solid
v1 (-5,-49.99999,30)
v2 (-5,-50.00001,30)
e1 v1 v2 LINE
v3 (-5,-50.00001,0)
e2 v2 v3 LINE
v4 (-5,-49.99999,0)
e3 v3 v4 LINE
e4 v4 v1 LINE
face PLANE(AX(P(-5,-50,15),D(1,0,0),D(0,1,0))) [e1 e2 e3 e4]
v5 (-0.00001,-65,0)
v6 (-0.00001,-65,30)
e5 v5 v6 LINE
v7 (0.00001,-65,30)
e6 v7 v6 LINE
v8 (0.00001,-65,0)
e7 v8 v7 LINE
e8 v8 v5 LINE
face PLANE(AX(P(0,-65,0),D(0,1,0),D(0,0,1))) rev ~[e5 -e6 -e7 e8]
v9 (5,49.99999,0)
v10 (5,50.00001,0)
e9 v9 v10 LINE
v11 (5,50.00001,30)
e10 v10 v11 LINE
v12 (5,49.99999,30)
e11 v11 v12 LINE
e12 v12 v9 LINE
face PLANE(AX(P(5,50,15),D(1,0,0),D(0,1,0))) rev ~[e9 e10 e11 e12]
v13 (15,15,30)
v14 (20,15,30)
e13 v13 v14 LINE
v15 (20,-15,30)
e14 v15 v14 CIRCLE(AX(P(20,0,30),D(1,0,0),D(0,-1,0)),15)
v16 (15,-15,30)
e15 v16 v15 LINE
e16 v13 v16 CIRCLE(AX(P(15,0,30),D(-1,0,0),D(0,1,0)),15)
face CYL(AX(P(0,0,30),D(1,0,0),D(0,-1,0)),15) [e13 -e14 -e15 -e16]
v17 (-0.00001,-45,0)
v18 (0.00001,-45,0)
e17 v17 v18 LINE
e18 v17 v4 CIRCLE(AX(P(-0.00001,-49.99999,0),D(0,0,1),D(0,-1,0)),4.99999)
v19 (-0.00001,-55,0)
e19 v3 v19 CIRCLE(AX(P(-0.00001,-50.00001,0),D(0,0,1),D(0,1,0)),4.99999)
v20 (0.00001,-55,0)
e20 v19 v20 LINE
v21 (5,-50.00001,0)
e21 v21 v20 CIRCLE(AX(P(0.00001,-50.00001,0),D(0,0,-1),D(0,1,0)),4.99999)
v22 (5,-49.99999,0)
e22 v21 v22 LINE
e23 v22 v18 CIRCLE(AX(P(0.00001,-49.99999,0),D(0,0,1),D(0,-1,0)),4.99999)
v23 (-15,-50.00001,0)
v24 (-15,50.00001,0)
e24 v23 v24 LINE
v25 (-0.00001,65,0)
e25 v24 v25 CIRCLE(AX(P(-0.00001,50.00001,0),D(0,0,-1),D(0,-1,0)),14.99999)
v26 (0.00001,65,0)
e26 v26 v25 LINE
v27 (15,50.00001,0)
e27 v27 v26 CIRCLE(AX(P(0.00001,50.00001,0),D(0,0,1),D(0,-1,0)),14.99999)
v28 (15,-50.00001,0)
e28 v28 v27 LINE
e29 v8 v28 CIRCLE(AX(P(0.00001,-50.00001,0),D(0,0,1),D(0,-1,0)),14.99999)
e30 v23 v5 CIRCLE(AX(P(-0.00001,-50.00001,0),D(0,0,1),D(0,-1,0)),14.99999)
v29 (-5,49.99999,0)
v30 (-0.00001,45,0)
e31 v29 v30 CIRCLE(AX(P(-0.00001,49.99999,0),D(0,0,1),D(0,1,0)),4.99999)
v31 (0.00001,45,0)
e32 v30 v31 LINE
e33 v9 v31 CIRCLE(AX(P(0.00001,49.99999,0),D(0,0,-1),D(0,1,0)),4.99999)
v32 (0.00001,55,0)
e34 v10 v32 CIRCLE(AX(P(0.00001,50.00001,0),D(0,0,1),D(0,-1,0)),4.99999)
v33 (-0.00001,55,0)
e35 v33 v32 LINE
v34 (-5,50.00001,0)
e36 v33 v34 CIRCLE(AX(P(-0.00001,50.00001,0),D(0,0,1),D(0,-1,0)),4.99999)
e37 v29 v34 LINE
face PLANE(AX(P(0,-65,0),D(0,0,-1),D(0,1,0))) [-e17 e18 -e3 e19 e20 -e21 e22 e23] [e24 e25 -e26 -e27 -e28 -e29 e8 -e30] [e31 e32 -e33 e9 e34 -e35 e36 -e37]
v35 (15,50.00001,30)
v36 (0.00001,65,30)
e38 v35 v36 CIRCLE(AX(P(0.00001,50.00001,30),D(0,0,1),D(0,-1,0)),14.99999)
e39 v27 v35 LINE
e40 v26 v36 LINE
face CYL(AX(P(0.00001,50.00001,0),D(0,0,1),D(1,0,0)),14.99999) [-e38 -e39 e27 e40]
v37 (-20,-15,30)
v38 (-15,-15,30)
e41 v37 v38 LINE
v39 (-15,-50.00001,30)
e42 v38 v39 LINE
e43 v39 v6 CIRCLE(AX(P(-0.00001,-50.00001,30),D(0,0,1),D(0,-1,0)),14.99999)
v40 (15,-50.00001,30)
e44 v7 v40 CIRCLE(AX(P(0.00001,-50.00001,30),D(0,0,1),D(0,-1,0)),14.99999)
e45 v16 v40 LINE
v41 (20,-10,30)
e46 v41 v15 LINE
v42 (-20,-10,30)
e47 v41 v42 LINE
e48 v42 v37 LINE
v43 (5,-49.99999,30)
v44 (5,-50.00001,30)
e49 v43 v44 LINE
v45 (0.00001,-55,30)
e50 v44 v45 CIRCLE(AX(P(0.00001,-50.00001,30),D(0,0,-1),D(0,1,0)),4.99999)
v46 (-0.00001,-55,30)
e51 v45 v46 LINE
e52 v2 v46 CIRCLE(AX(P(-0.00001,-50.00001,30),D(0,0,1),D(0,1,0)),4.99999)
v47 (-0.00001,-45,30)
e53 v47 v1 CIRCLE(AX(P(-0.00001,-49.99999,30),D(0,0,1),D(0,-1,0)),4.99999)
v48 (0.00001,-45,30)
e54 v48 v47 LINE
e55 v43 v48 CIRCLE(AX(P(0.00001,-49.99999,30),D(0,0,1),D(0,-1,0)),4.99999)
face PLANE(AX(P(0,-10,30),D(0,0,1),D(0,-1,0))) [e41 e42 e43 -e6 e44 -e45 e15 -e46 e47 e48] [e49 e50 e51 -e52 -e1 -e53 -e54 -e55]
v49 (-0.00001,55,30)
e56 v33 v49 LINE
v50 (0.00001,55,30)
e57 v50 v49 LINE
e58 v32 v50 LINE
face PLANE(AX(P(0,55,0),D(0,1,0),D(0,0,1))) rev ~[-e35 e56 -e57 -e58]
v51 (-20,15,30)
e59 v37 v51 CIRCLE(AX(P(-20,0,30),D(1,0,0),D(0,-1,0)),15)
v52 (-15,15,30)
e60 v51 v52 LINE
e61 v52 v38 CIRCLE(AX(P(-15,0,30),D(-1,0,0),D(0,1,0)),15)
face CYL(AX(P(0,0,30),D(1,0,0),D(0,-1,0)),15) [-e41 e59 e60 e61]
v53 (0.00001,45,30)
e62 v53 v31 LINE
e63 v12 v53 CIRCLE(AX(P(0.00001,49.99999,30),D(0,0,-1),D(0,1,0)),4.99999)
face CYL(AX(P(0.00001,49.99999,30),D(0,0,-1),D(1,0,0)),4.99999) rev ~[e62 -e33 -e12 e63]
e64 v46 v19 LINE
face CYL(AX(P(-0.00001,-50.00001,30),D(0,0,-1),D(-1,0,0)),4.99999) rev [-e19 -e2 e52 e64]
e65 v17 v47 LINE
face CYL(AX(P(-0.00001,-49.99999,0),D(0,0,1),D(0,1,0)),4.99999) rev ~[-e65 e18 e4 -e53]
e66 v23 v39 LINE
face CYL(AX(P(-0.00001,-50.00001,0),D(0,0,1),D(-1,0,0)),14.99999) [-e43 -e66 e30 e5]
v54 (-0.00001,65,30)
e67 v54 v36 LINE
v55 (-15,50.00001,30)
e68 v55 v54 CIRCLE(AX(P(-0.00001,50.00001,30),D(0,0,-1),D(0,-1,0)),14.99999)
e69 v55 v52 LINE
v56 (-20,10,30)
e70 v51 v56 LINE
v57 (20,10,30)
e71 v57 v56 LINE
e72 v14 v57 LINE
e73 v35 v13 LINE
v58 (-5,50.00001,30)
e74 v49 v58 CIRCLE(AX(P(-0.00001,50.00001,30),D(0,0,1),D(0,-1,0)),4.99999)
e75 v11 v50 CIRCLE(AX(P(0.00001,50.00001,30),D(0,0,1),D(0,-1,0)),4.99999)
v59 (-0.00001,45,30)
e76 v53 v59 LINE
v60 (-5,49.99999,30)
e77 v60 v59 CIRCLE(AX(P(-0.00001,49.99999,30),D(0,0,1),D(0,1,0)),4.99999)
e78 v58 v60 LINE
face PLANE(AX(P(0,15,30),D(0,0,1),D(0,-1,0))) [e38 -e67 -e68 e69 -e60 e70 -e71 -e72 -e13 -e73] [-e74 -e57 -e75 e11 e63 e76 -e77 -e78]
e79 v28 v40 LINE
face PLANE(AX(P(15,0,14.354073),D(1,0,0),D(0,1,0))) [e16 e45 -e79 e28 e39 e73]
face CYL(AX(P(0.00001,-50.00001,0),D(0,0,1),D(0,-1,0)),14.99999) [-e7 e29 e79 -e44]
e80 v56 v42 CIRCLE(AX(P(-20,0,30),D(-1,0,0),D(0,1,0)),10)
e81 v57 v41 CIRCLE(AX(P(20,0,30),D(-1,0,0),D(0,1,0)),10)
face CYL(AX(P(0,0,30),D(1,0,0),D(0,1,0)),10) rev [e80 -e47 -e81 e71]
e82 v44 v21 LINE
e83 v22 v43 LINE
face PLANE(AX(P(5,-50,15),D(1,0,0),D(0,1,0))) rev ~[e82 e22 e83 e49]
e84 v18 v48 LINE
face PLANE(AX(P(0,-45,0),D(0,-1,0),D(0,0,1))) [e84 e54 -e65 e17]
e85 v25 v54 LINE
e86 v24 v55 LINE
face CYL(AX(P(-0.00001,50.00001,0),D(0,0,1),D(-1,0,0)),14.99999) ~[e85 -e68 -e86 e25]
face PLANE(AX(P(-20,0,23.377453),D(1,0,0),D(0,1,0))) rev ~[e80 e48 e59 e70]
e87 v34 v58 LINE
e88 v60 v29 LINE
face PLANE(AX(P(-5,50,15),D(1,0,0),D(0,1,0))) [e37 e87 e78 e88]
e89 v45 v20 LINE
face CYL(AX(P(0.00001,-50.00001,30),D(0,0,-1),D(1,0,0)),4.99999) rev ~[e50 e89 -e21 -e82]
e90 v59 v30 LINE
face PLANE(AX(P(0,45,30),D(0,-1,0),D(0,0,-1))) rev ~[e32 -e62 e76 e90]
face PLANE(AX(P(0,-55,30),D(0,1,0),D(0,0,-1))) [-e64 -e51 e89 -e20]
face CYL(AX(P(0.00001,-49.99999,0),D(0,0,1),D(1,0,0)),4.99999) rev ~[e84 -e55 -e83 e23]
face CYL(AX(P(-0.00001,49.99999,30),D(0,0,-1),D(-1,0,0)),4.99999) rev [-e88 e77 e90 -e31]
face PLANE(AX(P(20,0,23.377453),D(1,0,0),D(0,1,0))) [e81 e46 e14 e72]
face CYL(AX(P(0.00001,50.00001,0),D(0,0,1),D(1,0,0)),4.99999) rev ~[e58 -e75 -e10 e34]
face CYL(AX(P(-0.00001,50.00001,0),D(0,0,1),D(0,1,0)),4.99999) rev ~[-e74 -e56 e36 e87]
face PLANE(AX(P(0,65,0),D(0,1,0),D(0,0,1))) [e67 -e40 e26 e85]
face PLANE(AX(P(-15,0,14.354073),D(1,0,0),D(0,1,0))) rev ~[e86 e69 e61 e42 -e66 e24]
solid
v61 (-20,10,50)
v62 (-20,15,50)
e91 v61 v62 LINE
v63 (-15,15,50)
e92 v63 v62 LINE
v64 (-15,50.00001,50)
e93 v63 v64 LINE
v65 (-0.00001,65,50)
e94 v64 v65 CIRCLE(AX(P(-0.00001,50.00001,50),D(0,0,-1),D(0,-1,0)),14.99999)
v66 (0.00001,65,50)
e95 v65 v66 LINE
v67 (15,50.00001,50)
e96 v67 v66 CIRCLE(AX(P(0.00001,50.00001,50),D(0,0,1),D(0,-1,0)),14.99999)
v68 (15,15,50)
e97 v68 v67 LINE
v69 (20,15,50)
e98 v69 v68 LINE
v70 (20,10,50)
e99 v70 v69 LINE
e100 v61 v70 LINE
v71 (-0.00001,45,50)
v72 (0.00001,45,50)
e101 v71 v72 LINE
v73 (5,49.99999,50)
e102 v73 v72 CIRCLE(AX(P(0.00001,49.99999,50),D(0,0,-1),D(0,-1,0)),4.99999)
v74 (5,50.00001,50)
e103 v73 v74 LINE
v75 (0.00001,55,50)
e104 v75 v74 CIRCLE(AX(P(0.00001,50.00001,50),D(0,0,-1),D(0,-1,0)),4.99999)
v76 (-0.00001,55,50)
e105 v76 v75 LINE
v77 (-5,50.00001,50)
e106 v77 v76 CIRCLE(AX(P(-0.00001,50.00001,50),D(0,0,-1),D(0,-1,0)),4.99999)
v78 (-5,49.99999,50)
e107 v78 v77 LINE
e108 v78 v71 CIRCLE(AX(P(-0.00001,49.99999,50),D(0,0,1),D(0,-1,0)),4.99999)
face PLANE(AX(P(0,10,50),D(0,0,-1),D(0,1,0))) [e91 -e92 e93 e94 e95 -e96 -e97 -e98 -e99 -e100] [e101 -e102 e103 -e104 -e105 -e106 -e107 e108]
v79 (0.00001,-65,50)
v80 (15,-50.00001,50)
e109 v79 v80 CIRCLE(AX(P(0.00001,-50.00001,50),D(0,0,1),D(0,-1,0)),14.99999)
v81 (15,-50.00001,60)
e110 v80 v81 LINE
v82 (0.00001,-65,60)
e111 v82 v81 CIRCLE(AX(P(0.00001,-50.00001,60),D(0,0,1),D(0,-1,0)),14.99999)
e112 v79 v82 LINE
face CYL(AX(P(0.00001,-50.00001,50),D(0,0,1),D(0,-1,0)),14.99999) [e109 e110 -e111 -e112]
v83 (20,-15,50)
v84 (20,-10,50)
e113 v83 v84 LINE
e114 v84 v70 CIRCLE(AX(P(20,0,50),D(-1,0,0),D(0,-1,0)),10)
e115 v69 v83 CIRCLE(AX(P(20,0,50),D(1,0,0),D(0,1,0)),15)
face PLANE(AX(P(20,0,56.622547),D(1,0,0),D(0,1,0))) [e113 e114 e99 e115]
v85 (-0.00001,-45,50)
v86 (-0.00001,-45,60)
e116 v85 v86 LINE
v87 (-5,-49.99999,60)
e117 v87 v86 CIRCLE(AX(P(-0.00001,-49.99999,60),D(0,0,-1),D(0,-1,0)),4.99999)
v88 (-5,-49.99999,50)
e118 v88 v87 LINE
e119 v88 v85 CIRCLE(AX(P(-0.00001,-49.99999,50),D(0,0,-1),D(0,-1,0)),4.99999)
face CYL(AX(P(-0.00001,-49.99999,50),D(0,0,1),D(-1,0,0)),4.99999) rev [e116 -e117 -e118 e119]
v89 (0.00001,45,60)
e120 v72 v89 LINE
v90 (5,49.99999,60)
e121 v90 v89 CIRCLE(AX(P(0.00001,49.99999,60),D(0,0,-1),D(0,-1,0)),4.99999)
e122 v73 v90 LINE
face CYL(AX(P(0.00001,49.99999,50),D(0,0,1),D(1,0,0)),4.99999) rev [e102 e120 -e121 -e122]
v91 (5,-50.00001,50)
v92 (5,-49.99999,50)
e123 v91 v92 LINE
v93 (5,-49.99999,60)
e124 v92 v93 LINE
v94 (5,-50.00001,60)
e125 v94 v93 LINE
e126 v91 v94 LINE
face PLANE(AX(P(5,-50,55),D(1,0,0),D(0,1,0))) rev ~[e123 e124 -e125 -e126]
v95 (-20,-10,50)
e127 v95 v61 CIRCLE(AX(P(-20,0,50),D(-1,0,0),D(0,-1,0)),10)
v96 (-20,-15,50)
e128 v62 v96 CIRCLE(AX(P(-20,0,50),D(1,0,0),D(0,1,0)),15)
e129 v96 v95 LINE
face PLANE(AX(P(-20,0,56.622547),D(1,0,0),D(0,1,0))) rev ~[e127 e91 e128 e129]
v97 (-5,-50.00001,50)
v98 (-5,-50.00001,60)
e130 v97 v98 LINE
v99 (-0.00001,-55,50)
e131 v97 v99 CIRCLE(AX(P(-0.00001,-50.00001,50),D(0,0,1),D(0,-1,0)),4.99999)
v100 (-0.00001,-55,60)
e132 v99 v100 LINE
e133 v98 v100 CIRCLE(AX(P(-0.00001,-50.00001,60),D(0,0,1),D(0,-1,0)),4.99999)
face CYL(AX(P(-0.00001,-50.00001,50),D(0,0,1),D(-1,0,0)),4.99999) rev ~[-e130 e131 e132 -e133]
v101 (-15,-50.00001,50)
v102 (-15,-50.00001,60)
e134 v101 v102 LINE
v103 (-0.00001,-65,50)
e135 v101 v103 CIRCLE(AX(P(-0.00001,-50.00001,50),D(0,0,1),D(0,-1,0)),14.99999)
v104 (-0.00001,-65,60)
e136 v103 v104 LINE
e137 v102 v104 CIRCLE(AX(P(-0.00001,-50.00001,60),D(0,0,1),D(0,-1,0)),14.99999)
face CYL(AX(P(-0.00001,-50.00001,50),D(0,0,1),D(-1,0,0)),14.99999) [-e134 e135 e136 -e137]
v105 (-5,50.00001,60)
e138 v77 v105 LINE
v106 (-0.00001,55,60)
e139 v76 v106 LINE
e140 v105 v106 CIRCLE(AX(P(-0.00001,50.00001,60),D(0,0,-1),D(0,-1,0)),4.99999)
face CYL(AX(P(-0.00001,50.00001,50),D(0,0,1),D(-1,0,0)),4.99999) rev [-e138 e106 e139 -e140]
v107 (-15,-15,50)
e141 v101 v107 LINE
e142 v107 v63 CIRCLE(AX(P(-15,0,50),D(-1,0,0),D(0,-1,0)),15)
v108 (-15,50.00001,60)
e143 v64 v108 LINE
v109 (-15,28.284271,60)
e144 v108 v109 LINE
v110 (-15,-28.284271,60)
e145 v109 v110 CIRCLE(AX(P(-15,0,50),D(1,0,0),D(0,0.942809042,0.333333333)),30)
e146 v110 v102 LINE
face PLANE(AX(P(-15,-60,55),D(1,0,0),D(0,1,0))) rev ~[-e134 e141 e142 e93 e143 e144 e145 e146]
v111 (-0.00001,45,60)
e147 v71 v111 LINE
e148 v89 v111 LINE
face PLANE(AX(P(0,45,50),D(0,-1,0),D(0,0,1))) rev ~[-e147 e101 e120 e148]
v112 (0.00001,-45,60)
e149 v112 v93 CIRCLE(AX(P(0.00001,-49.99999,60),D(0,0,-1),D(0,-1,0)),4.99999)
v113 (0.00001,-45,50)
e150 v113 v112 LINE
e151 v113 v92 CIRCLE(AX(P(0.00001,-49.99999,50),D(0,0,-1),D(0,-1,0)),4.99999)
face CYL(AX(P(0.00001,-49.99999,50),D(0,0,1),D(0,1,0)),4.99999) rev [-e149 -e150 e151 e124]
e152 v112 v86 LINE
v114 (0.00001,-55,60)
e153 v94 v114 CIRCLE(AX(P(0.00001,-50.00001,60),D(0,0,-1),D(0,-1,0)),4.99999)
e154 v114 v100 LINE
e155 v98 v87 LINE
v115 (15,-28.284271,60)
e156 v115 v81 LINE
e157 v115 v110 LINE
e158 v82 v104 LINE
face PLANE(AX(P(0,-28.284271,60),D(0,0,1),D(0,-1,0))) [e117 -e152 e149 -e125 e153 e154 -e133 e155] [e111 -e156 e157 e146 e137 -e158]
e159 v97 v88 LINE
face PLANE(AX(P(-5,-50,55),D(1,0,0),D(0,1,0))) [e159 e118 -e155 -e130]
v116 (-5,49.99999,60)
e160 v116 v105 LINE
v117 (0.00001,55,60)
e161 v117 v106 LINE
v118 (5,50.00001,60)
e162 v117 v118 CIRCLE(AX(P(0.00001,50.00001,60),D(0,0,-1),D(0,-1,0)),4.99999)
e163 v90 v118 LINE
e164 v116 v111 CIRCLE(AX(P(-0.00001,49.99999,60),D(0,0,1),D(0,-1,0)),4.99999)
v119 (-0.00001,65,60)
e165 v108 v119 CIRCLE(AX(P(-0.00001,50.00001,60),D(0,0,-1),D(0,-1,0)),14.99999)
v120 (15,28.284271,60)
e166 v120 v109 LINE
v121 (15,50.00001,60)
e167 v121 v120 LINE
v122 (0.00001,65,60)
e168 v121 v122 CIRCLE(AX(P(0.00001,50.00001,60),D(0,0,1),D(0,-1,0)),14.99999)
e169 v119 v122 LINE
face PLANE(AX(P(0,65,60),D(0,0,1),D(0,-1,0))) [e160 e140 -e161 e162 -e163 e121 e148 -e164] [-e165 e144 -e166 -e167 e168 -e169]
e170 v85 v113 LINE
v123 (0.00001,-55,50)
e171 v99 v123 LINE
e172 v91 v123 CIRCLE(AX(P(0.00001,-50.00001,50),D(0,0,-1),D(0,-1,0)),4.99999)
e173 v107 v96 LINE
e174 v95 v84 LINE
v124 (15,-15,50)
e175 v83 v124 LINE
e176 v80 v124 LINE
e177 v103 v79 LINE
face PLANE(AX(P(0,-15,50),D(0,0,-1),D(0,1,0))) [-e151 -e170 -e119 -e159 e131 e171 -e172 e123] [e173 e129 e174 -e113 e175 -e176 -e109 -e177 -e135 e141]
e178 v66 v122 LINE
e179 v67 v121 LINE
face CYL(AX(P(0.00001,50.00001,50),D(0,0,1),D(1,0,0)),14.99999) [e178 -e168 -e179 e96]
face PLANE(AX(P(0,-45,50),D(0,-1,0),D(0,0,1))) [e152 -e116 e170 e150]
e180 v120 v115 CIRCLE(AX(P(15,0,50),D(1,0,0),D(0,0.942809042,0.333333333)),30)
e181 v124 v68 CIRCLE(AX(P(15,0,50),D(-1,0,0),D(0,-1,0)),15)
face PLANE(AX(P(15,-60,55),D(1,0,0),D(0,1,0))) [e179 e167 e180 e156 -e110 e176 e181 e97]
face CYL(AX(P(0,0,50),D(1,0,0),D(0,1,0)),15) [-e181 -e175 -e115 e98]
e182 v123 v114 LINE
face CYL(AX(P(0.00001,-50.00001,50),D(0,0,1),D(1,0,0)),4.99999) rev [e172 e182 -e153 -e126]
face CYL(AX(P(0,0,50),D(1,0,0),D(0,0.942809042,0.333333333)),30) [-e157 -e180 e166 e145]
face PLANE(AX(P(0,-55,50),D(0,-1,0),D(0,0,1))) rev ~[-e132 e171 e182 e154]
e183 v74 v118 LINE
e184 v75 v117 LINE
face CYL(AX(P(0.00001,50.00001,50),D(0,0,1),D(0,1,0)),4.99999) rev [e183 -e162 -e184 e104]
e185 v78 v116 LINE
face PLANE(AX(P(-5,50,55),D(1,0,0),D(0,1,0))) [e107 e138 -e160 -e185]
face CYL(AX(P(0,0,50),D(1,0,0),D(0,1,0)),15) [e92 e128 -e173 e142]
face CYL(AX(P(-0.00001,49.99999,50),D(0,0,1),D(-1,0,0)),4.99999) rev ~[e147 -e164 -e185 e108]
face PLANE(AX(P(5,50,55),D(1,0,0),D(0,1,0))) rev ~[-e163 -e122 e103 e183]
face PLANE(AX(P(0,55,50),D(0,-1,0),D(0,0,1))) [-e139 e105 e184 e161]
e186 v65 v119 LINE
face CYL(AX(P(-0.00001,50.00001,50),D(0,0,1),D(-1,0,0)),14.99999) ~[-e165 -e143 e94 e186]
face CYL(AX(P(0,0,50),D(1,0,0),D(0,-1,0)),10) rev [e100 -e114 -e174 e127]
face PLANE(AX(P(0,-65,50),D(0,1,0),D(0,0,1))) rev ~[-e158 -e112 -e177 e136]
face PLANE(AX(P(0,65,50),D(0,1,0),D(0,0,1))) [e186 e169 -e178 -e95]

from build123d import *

# Parameters (mm, degrees)
F1_DEPTH = 20
F0_W     = 10
F0_H     = 10
F2_DEPTH = 15
F0_H_2   = 30
F3_DEPTH = 5
F4_R     = 4.99999
F4_2_R   = 4.99999
F5_R     = 14.99999
F5_2_R   = 14.99999


# Not quite as in the source:
# - a fillet or chamfer is up to 0.001 mm smaller than in the source, because OpenCascade refuses the exact size


with BuildPart() as f1:
    # F0 (on Right) → F1 (new body, symmetric)
    with BuildSketch(Plane.YZ):
        with BuildLine():
            Line((-15, 50), (-10, 50))
            ThreePointArc((-10, 50), (0, 60), (10, 50))
            Line((10, 50), (15, 50))
            ThreePointArc((15, 50), (0, 65), (-15, 50))
        make_face()
    extrude(amount=F1_DEPTH, both=True)

    # F0 (on Right) → F2 (join, symmetric)
    with BuildSketch(Plane.YZ):
        with Locations((-60, 55)):
            Rectangle(F0_W, F0_H)
        with BuildLine():
            Line((-45, 50), (-15, 50))
            ThreePointArc((-15, 50), (0, 65), (15, 50))
            Line((15, 50), (45, 50))
            Line((45, 50), (45, 60))
            Line((45, 60), (28.2842712475, 60))
            ThreePointArc((28.2842712475, 60), (0, 80), (-28.2842712475, 60))
            Line((-28.2842712475, 60), (-45, 60))
            Line((-45, 60), (-45, 50))
        make_face()
        with Locations((-50, 55)):
            Rectangle(F0_W, F0_H)
        with Locations((50, 55)):
            Rectangle(F0_W, F0_H)
        with Locations((60, 55)):
            Rectangle(F0_W, F0_H)
    extrude(amount=F2_DEPTH, both=True)


with BuildPart() as f1b:
    # F0 (on Right) → F1, piece 2 (new body, symmetric)
    with BuildSketch(Plane.YZ):
        with BuildLine():
            Line((-10, 30), (-15, 30))
            ThreePointArc((-15, 30), (0, 15), (15, 30))
            Line((15, 30), (10, 30))
            ThreePointArc((10, 30), (0, 20), (-10, 30))
        make_face()
    extrude(amount=F1_DEPTH, both=True)

    # F0 (on Right) → F2, piece 2 (join, symmetric)
    with BuildSketch(Plane.YZ):
        with BuildLine():
            Line((-45, 30), (-45, 0))
            Line((-45, 0), (0, 0))
            Line((0, 0), (45, 0))
            Line((45, 0), (45, 30))
            Line((45, 30), (15, 30))
            ThreePointArc((15, 30), (0, 15), (-15, 30))
            Line((-15, 30), (-45, 30))
        make_face()
        Polygon((45, 30), (45, 0), (50, 0), (55, 0), (55, 30), (50, 30), align=None)
        with Locations((60, 15)):
            Rectangle(F0_W, F0_H_2)
        Polygon((-55, 30), (-55, 0), (-50, 0), (-45, 0), (-45, 30), (-50, 30), align=None)
        with Locations((-60, 15)):
            Rectangle(F0_W, F0_H_2)
    extrude(amount=F2_DEPTH, both=True)


with BuildPart() as f3_tool:
    # F0 (on Right) → F3 (new body, symmetric)
    with BuildSketch(Plane.YZ):
        with Locations((-50, 55)):
            Rectangle(F0_W, F0_H)
        Polygon((-55, 30), (-55, 0), (-50, 0), (-45, 0), (-45, 30), (-50, 30), align=None)
        with Locations((50, 55)):
            Rectangle(F0_W, F0_H)
        Polygon((45, 30), (45, 0), (50, 0), (55, 0), (55, 30), (50, 30), align=None)
    extrude(amount=F3_DEPTH, both=True)


with BuildPart() as f1_1:
    add(f1.part)

    # F3: cut by f3_tool
    add(f3_tool.part, mode=Mode.SUBTRACT)

    # F4 (radius 5 in the source; OpenCascade refuses exactly that, so slightly less here)
    f4_edges = [f1_1.edges().sort_by_distance(p)[0] for p in [
        (-5, -45, 55),
        (-5, 55, 55),
        (-5, -55, 55),
        (-5, 45, 55),
        (5, -55, 55),
        (5, 45, 55),
        (5, 55, 55),
        (5, -45, 55),
    ]]
    fillet(f4_edges, radius=F4_R)

    # F5#2 (radius 15 in the source; OpenCascade refuses exactly that, so slightly less here)
    f5_2_edges = [f1_1.edges().sort_by_distance(p)[0] for p in [
        (-15, -65, 55),
        (15, -65, 55),
        (15, 65, 55),
        (-15, 65, 55),
    ]]
    fillet(f5_2_edges, radius=F5_2_R)


with BuildPart() as f1b_1:
    add(f1b.part)

    # F3: cut by f3_tool
    add(f3_tool.part, mode=Mode.SUBTRACT)

    # F4#2 (radius 5 in the source; OpenCascade refuses exactly that, so slightly less here)
    f4_2_edges = [f1b_1.edges().sort_by_distance(p)[0] for p in [
        (-5, 55, 15),
        (-5, -45, 15),
        (-5, -55, 15),
        (-5, 45, 15),
        (5, -55, 15),
        (5, -45, 15),
        (5, 55, 15),
        (5, 45, 15),
    ]]
    fillet(f4_2_edges, radius=F4_2_R)

    # F5 (radius 15 in the source; OpenCascade refuses exactly that, so slightly less here)
    f5_edges = [f1b_1.edges().sort_by_distance(p)[0] for p in [
        (15, -65, 15),
        (-15, -65, 15),
        (15, 65, 15),
        (-15, 65, 15),
    ]]
    fillet(f5_edges, radius=F5_R)


solid = Compound([f1_1.part, f1b_1.part])
